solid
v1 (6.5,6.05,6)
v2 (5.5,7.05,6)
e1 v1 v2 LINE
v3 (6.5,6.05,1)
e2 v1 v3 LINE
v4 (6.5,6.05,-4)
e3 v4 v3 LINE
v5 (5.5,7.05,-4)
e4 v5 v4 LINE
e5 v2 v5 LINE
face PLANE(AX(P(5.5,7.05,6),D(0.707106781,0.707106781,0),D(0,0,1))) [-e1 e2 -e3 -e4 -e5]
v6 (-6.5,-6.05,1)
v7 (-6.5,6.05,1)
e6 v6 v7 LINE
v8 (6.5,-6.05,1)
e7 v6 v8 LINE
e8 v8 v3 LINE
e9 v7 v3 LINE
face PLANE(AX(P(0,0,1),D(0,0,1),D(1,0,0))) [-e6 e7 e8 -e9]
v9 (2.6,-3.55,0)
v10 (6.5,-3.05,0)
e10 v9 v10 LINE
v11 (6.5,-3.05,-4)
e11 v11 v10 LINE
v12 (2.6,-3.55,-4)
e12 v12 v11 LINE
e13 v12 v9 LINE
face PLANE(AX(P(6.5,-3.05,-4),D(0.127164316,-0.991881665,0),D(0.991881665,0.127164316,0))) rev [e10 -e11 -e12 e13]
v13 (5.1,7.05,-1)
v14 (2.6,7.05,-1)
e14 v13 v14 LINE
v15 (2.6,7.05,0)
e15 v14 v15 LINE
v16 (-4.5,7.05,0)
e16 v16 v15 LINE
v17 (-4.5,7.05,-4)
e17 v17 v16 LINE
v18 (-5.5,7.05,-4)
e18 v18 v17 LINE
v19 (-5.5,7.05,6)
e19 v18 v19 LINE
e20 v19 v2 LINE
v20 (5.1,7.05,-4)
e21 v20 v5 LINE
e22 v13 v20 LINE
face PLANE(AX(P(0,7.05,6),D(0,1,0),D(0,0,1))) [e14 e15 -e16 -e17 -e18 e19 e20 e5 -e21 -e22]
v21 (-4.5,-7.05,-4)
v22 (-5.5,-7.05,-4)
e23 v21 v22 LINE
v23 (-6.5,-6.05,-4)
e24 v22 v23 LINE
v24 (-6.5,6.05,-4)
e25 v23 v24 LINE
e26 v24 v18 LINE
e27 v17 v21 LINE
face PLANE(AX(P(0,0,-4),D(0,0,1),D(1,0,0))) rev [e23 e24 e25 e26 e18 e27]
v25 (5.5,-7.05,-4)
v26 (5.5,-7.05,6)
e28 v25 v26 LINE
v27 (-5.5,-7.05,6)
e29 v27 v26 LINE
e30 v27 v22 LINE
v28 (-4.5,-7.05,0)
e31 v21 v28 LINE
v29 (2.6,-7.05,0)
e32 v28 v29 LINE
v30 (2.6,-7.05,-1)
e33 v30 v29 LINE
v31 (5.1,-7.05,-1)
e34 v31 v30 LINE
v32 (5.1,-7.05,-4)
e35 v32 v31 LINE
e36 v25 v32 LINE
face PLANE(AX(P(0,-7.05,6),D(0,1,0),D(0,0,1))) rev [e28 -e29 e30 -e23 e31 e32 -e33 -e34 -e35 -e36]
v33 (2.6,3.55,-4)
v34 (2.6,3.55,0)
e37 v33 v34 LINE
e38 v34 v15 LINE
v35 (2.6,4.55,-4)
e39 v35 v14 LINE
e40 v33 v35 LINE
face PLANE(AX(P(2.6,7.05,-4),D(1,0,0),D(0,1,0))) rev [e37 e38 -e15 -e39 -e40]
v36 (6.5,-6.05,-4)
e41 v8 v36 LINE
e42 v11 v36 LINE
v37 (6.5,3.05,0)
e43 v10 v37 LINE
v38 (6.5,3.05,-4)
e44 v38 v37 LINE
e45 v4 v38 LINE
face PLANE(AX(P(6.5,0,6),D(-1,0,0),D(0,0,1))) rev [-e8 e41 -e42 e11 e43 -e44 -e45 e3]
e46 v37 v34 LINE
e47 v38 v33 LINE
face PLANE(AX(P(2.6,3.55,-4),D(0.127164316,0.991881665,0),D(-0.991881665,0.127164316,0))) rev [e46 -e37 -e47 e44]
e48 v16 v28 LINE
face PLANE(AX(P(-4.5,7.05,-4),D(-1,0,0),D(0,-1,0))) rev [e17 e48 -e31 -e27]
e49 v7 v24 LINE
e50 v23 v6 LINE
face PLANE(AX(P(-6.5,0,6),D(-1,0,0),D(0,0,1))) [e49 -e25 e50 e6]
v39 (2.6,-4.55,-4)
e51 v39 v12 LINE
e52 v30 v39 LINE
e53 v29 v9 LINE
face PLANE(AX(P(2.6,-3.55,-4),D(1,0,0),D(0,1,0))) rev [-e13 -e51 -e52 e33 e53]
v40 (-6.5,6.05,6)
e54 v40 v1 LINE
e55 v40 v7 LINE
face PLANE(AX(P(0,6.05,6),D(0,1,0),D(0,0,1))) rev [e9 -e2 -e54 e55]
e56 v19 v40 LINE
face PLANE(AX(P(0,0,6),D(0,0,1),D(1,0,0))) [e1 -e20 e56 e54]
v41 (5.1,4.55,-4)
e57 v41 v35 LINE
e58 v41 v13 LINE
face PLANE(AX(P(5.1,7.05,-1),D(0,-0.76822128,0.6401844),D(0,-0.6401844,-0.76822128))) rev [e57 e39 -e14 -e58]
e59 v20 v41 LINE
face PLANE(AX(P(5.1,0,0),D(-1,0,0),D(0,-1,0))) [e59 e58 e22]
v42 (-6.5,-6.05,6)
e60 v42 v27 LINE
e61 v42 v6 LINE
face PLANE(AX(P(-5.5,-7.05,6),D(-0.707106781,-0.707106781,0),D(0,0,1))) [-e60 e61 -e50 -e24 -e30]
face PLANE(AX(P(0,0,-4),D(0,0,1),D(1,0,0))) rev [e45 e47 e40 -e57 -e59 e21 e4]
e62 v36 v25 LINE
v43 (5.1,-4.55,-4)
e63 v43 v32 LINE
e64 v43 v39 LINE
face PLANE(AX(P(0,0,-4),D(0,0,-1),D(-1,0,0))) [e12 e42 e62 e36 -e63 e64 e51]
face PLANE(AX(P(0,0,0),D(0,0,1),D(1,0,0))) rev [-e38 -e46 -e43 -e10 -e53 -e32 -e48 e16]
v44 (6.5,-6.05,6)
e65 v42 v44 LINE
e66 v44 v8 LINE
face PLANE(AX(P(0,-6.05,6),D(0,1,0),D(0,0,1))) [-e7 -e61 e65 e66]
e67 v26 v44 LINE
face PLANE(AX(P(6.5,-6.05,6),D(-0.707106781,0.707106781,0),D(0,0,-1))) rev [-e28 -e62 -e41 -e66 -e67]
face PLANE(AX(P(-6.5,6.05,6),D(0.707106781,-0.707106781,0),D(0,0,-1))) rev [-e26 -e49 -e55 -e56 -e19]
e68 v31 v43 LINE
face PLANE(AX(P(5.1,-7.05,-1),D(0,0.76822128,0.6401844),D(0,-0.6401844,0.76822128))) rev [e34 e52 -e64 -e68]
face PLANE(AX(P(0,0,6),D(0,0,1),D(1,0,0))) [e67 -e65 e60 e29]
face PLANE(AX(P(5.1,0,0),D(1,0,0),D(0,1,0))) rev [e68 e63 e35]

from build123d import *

# Parameters (mm, degrees)
SKETCH1_W             = 13
SKETCH1_H             = 1
BOSS_EXTRUDE1_DEPTH   = 6
BOSS_EXTRUDE1_2_DEPTH = 6
SKETCH1_3_W           = 13
SKETCH1_3_H           = 12.1
BOSS_EXTRUDE2_DEPTH   = 1
SKETCH2_W             = 2
SKETCH2_H             = 14.1
BOSS_EXTRUDE3_DEPTH   = 4
CHAMFER1_SIZE         = 1
CUT_EXTRUDE1_DEPTH    = 2.5


with BuildPart() as part:
    # Sketch1 → Boss-Extrude1 (new body)
    with BuildSketch(Plane.XY):
        with Locations((0, 6.55)):
            Rectangle(SKETCH1_W, SKETCH1_H)
    extrude(amount=BOSS_EXTRUDE1_DEPTH)



with BuildPart() as body_2:
    # Sketch1 → Boss-Extrude1 2 (new body)
    with BuildSketch(Plane.XY):
        with Locations((0, -6.55)):
            Rectangle(SKETCH1_W, SKETCH1_H)
    extrude(amount=BOSS_EXTRUDE1_2_DEPTH)


with BuildPart() as part_1:
    add(part.part)

    add(body_2.part)  # Boss-Extrude2 merges body 2
    # Sketch1<3> → Boss-Extrude2 (add)
    with BuildSketch(Plane.XY):
        Rectangle(SKETCH1_3_W, SKETCH1_3_H)
    extrude(amount=BOSS_EXTRUDE2_DEPTH)

    # Sketch2 → Boss-Extrude3 (add)
    with BuildSketch(Plane(origin=(0, 0, 0), x_dir=(-1, 0, 0), z_dir=(0, 0, -1))):
        with Locations((5.5, 0)):
            Rectangle(SKETCH2_W, SKETCH2_H)
        Polygon((-6.5, -3.05), (-2.6, -3.55), (-2.6, -7.05), (-6.5, -7.05), align=None)
        Polygon((-6.5, 7.05), (-2.6, 7.05), (-2.6, 3.55), (-6.5, 3.05), align=None)
    extrude(amount=BOSS_EXTRUDE3_DEPTH)

    # Chamfer1
    chamfer1_edges = [part_1.edges().sort_by_distance(p)[0] for p in [
        (-6.5, -7.05, 1),
        (6.5, -7.05, 1),
        (-6.5, 7.05, 1),
        (6.5, 7.05, 1),
    ]]
    chamfer(chamfer1_edges, length=CHAMFER1_SIZE - 0.0001)  # a hair under: the kernel refuses the full size

    # Sketch3 → Cut-Extrude1 (cut)
    with BuildSketch(Plane.ZY.offset(-2.6)):
        Polygon((-1, -7.05), (-4, -4.55), (-4, -7.05), align=None)
        Polygon((-1, 7.05), (-4, 4.55), (-4, 7.05), align=None)
    extrude(amount=-CUT_EXTRUDE1_DEPTH, mode=Mode.SUBTRACT)


solid = part_1.part
